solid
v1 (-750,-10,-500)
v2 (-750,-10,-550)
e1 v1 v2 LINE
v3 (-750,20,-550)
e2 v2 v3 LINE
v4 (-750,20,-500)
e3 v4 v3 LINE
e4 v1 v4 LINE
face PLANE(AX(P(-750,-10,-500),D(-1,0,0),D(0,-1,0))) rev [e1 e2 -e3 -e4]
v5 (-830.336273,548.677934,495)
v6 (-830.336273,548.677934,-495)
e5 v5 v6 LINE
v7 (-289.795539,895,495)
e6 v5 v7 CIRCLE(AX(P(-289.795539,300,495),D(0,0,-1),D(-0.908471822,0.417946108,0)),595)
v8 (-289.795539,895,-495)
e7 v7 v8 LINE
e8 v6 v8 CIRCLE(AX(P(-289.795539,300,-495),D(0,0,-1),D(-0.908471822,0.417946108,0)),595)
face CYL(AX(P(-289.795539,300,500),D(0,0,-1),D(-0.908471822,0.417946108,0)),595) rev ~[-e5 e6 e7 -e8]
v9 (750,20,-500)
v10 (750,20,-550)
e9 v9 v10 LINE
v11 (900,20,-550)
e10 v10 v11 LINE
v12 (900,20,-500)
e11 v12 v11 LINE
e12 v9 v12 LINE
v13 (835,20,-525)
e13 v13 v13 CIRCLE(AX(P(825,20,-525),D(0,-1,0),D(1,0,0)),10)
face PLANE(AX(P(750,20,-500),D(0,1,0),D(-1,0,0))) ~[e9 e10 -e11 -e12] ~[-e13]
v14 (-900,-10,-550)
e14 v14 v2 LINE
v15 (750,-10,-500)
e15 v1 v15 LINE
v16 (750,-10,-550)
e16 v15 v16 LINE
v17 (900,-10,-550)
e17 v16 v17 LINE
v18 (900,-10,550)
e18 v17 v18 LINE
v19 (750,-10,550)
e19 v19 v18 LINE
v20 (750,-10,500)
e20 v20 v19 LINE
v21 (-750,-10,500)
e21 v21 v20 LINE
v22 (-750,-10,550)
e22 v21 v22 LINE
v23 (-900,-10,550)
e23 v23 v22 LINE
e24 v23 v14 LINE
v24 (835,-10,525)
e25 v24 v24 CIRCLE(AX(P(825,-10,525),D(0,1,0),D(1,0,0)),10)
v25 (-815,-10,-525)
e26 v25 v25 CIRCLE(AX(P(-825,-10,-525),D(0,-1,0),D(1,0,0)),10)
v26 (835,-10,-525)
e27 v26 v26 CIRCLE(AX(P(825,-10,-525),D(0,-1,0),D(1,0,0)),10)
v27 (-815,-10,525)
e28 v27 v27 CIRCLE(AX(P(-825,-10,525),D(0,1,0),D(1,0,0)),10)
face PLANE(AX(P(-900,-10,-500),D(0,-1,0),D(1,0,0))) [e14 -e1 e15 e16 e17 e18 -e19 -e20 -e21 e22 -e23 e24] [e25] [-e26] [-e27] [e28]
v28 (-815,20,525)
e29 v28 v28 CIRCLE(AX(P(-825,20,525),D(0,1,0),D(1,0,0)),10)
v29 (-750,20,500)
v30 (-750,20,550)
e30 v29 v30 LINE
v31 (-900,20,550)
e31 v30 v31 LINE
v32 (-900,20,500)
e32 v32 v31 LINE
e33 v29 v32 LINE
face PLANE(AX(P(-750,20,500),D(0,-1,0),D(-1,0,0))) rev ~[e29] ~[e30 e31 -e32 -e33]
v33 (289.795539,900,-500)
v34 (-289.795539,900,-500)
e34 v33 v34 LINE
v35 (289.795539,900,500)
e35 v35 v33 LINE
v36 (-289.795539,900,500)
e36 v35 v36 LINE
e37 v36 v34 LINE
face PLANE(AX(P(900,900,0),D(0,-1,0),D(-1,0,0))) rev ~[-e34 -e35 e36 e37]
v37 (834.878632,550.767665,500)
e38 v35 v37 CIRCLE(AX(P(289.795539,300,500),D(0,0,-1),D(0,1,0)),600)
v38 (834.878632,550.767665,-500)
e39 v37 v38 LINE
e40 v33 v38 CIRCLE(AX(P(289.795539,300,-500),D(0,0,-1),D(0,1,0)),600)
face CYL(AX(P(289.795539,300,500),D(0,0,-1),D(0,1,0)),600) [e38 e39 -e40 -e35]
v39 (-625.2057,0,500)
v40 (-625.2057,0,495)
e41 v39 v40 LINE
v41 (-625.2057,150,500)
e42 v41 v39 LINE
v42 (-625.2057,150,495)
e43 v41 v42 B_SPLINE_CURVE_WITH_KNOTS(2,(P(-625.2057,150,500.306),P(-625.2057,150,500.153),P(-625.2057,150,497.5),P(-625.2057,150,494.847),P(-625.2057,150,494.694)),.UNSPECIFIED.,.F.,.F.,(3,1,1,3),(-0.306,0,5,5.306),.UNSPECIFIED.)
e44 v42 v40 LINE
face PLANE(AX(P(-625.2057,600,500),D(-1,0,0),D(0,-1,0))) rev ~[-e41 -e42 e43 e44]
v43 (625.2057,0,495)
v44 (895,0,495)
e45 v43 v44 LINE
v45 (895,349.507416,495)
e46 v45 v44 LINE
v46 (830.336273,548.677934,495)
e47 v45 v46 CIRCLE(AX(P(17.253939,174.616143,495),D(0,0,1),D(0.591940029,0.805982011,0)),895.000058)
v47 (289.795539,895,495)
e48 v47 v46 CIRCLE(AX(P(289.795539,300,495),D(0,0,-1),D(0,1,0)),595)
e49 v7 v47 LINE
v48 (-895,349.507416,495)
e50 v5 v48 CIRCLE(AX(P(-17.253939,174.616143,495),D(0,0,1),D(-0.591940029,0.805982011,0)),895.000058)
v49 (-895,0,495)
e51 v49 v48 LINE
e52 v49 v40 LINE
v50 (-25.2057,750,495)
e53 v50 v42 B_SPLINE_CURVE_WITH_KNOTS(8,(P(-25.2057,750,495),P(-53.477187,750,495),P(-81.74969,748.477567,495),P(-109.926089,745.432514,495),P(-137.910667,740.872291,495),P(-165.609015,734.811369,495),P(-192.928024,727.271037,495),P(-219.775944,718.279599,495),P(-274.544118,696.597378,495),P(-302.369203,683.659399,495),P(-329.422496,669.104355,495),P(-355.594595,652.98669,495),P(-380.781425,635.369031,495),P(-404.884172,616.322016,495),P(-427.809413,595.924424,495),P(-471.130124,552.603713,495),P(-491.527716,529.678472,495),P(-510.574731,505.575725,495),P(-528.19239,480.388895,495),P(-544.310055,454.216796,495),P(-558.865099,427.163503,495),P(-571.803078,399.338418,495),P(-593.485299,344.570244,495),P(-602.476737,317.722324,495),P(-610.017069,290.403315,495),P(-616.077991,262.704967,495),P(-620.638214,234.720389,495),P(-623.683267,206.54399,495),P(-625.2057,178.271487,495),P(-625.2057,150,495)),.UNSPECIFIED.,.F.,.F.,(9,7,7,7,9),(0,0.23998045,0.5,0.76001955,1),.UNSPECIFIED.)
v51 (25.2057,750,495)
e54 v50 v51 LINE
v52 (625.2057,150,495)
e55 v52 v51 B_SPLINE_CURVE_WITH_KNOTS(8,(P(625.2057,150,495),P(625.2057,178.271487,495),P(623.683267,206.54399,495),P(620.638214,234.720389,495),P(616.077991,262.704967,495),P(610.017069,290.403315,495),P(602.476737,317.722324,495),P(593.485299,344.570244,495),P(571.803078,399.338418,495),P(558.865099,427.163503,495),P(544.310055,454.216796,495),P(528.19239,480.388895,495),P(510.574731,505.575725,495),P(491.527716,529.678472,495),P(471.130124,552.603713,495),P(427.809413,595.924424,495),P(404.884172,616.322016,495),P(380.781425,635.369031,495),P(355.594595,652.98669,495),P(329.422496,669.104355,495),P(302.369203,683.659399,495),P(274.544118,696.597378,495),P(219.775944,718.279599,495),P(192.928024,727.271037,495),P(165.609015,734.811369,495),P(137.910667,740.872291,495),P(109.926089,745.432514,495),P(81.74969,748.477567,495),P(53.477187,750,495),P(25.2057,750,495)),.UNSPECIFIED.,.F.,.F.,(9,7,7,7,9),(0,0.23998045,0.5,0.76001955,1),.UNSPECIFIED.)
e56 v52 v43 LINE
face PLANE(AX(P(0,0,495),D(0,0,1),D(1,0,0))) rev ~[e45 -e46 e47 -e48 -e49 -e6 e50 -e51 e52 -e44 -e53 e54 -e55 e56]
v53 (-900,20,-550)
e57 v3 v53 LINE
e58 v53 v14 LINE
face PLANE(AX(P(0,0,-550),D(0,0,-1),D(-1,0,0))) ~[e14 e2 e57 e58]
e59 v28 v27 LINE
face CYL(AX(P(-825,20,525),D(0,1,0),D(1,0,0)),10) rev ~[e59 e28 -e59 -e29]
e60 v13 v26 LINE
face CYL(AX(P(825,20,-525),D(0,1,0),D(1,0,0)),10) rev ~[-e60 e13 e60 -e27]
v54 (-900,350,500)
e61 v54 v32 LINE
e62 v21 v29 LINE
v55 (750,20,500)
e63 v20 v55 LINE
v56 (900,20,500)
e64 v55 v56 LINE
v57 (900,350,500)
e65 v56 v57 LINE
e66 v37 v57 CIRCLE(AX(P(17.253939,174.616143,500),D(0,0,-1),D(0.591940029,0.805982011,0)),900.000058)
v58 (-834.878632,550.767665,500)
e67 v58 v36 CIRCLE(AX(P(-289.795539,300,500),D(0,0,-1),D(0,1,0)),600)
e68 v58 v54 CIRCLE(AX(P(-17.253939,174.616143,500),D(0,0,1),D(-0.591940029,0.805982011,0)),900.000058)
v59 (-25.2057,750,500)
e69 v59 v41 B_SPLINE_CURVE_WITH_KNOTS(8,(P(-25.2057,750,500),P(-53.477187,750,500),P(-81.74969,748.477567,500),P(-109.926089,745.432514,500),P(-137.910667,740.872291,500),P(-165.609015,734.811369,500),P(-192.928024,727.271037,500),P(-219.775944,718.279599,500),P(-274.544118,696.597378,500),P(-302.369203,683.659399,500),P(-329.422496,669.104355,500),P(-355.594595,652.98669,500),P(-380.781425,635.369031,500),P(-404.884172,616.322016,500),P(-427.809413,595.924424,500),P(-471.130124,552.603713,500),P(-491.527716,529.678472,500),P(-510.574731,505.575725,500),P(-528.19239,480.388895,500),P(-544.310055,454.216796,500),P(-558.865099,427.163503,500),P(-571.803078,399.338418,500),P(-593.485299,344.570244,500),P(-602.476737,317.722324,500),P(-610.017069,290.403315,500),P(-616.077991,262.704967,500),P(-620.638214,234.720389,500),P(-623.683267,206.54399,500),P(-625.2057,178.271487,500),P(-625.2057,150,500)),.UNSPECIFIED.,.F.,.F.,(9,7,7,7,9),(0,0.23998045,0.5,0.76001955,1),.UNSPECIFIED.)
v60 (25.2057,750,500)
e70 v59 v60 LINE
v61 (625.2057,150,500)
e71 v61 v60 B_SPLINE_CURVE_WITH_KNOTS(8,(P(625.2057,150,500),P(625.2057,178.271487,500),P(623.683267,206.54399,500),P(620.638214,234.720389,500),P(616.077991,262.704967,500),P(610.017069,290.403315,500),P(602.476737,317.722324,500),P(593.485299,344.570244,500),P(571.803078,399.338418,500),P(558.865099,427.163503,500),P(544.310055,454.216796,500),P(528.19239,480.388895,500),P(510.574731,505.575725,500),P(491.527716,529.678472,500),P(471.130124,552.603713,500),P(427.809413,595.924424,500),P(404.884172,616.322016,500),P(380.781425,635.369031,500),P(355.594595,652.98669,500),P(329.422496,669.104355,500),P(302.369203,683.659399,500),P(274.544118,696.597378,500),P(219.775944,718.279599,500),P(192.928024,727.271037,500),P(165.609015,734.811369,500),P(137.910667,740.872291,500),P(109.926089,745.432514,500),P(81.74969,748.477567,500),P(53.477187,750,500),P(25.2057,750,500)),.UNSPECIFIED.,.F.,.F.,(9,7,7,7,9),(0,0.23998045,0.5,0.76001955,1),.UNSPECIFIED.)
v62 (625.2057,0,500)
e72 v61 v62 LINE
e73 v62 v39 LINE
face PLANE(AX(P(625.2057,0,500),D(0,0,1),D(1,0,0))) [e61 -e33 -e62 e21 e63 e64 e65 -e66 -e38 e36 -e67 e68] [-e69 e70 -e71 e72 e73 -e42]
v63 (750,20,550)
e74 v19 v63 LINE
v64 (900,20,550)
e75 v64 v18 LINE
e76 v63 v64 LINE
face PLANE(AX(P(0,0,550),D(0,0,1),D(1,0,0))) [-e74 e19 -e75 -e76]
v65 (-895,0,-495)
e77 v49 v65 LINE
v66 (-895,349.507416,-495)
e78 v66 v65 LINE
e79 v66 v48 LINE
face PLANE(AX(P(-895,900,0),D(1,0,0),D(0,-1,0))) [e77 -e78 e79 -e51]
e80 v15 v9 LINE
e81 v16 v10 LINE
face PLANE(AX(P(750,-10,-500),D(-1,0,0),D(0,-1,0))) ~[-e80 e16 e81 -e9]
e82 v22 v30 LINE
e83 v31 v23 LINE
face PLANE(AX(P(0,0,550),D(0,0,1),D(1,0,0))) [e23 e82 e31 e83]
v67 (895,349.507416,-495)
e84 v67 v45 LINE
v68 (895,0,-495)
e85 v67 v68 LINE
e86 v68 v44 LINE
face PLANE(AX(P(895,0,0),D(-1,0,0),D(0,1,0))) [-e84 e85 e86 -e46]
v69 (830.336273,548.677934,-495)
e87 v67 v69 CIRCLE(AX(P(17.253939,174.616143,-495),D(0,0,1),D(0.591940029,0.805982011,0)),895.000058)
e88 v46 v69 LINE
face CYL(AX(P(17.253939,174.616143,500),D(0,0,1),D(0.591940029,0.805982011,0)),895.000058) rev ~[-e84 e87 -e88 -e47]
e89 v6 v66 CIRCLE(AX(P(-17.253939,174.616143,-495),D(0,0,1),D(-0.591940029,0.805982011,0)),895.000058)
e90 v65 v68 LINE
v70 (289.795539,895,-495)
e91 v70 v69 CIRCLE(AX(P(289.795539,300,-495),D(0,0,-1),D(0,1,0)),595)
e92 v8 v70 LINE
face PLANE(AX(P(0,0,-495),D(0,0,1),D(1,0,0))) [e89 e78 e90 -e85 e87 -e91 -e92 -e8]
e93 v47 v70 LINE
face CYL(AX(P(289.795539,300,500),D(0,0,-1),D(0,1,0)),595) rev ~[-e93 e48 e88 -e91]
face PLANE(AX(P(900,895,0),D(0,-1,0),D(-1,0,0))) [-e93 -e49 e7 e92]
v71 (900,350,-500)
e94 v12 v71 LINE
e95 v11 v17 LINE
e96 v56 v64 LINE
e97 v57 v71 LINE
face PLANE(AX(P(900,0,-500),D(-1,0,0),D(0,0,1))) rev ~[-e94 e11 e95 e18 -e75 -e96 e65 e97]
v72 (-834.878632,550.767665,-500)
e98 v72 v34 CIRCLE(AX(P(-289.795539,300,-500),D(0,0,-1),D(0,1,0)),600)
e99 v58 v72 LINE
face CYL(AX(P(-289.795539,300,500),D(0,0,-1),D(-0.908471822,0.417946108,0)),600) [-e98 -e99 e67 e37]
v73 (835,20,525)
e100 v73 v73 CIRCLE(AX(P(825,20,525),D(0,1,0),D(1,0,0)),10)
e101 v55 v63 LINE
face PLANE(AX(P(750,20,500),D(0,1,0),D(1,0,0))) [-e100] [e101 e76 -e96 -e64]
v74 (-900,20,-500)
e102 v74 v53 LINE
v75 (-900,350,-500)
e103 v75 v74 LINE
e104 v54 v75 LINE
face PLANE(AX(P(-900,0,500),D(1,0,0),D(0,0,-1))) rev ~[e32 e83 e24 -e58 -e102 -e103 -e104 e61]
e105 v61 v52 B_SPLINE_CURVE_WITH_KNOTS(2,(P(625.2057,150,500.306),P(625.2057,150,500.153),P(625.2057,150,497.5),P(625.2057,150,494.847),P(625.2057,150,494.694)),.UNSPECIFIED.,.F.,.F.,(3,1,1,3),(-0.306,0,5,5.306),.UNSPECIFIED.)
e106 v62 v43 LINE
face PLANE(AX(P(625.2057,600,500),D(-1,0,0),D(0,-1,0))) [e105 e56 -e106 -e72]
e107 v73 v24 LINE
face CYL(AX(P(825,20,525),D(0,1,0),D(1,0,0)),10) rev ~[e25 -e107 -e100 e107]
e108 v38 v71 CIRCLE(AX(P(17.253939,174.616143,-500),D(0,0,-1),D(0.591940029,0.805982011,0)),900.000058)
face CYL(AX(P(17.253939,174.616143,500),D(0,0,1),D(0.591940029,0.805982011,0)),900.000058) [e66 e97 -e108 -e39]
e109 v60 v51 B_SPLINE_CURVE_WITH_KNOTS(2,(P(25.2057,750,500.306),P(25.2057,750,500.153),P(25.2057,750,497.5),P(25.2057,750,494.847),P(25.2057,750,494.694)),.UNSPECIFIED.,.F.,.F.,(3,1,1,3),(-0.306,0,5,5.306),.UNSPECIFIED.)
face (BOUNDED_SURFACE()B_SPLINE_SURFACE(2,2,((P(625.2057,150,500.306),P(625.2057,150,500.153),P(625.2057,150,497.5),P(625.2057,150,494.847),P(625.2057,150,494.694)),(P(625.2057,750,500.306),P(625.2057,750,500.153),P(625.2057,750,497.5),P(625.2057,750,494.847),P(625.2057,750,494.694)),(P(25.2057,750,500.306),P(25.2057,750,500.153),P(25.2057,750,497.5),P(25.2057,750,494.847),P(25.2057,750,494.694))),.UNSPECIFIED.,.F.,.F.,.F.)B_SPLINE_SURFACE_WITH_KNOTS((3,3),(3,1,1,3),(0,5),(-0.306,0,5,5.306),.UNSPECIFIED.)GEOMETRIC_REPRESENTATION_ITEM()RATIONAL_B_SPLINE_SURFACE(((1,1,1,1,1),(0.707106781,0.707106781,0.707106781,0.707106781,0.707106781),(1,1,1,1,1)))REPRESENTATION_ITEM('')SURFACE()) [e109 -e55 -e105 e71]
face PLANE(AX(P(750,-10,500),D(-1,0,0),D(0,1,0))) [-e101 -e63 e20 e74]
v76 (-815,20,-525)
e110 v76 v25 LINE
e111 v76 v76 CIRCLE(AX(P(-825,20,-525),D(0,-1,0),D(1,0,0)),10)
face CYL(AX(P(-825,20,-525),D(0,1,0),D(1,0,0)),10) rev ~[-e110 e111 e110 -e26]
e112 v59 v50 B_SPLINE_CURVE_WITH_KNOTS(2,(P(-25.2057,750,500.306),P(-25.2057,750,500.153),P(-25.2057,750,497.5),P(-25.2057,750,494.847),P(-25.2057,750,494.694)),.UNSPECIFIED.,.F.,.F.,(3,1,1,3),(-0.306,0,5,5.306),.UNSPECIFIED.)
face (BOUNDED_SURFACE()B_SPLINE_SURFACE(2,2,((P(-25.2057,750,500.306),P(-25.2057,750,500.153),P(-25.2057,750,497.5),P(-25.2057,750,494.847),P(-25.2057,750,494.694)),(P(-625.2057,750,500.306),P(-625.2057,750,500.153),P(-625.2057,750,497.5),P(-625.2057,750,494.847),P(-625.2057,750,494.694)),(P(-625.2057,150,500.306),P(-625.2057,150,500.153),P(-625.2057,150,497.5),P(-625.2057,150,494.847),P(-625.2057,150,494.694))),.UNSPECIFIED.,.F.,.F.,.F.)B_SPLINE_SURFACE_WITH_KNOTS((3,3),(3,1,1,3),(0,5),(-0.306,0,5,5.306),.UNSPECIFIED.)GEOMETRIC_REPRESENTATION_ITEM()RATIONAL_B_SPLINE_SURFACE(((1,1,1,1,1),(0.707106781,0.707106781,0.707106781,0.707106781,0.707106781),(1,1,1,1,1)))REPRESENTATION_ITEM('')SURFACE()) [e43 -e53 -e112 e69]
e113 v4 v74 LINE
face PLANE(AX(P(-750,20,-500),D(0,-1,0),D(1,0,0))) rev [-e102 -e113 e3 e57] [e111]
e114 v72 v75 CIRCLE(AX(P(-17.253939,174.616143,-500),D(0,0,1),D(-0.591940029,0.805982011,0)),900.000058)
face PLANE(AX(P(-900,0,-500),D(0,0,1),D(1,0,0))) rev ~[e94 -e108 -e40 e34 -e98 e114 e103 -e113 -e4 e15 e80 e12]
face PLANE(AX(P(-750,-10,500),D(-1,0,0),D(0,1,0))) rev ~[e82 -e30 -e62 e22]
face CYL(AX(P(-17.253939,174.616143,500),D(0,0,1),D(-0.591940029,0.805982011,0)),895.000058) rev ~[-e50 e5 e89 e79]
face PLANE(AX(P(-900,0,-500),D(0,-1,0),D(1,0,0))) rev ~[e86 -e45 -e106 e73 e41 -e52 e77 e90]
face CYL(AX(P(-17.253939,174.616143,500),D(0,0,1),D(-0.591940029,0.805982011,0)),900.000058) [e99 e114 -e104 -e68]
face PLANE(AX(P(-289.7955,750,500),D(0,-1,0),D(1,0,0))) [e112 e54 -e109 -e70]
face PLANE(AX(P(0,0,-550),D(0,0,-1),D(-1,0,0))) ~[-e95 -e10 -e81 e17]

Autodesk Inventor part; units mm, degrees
ref_plane "YZ Plane" through (0, 0, 0) normal (1, 0, 0) x (0, 1, 0)
ref_plane "XZ Plane" through (0, 0, 0) normal (0, 1, 0) x (-1, 0, 0)
ref_plane "XY Plane" through (0, 0, 0) normal (0, 0, 1) x (1, 0, 0)
sketch "Sketch1" plane through (0, 0, 0) normal (0, 0, 1) x (1, 0, 0)
  line L0 (-900, 0) -> (900, 0)
  line L1 (900, 0) -> (900, 900)
  line L2 (900, 900) -> (-900, 900)
  line L3 (-900, 900) -> (-900, 0)
  line L4 (0, 900) -> (0, 0) construction
  dimension "d0" = 900
  dimension "length" = 1800
extrude "Extrusion1" add sketch "Sketch1" along normal mid plane 1000
sketch "Sketch2" plane through (0, 0, 500) normal (0, 0, 1) x (1, 0, 0)
  line L0 (-900, 900) -> (-900, 0) projected
  arc A0 (-550, 900) -> (-900, 350) centre (-17.254, 174.6162) ccw
  line L1 (900, 900) -> (-900, 900) projected
  line L2 (-900, 350) -> (-900, 900)
  line L3 (-900, 900) -> (-550, 900)
  point P0 (0, 0)
  dimension "d5" = 900
  dimension "d6" = 550
  dimension "d7" = 350
extrude "Extrusion2" cut sketch "Sketch2" against normal blind 1000
mirror "Mirror1" about plane through (0, 0, 0) normal (1, 0, 0) of "Extrusion2"
fillet "Fillet1" radius 600 2 edges at (-550, 900, 0) (550, 900, 0)
sketch "Sketch3" plane through (0, 0, 500) normal (0, 0, 1) x (1, 0, 0)
  arc A0 (-289.7955, 900) -> (-834.8786, 550.7676) centre (-289.7955, 300) ccw projected
  line L0 (289.7955, 900) -> (-289.7955, 900) projected
  arc A1 (834.8786, 550.7676) -> (289.7955, 900) centre (289.7955, 300) ccw projected
  arc A2 (-289.7955, 750) -> (-625.2057, 600) centre (-289.7955, 300) ccw
  line L1 (-289.7955, 750) -> (289.7955, 750)
  arc A3 (625.2057, 600) -> (289.7955, 750) centre (289.7955, 300) ccw
  line L2 (-625.2057, 600) -> (-625.2057, 0)
  line L3 (900, 0) -> (-900, 0) projected
  line L4 (625.2057, 600) -> (625.2057, 0)
  line L5 (625.2057, 0) -> (-625.2057, 0)
  point P0 (0, 0)
  point P1 (625.2057, 0)
  dimension "d11" = 150
  dimension "d12" = 600
shell "Shell2" thickness 5 removed faces 1 at (300, 0, 166.6667)
extrude "Extrusion3" cut sketch "Sketch3" against normal blind 10
fillet "Fillet2" radius 600 2 edges at (-625.2057, 600, 497.5) (625.2057, 600, 497.5)
sketch "Sketch4" plane through (-900, 0, -500) normal (0, -1, 0) x (1, 0, 0)
  line L0 (1525.2057, 1000) -> (1800, 1000) projected
  line L1 (0, 0) -> (1800, 0)
  line L2 (1800, 0) -> (1800, 1000)
  line L3 (1800, 1000) -> (0, 1000)
  line L4 (0, 1000) -> (0, 0)
  point P0 (900, 500)
extrude "Extrusion4" add sketch "Sketch4" along normal blind 10
sketch "Sketch5" plane through (0, 0, 500) normal (0, 0, 1) x (1, 0, 0)
  line L0 (-900, -10) -> (900, -10) projected
  line L1 (-900, -10) -> (-750, -10)
  line L2 (-750, -10) -> (-750, 20)
  line L3 (-750, 20) -> (-900, 20)
  line L4 (-900, 20) -> (-900, -10)
  line L5 (900, -10) -> (750, -10)
  line L6 (750, -10) -> (750, 20)
  line L7 (750, 20) -> (900, 20)
  line L8 (900, 20) -> (900, -10)
  point P0 (0, 0)
  dimension "d19" = 30
  dimension "d20" = 150
extrude "Extrusion5" add sketch "Sketch5" along normal blind 50
sketch "Sketch6" plane through (-900, 20, 500) normal (0, 1, 0) x (1, 0, 0)
  circle A0 centre (75, -25) radius 10
  circle A1 centre (1725, -25) radius 10
  line L0 (75, -25) -> (1725, -25) construction
  line L1 (1800, -50) -> (1650, -50) construction
  line L2 (1650, 0) -> (1650, -50) construction
  line L3 (0, 0) -> (0, -50) construction
  line L4 (75, -25) -> (0, -25) construction
  line L5 (1725, -25) -> (1800, -25) construction
  line L6 (1800, 1000) -> (1800, -50) construction
  point P0 (900, 500)
  dimension "d25" = 20
  dimension "d31" = 1650
  dimension "d32" = 75
extrude "Extrusion6" cut sketch "Sketch6" against normal blind 30
mirror "Mirror2" about plane through (0, 0, 0) normal (0, 0, 1) of "Extrusion6", "Extrusion5"
ref_plane "Work Plane1" through (0, 0, 0) normal (1, 0, 0) x (0, 1, 0)
equation "\"d0\" = 0.5 * length"
equation "\"d5\" = 0.5 * length"
equation "\"d11\" = 0.0833333 * length"
equation "\"d12\" = 0.333333 * length"
equation "\"d13\" = 0.00277778 * length"
equation "\"d14\" = 0.00555556 * length"
equation "\"d17\" = 0.00555556 * length"
equation "\"d19\" = 0.0166667 * length"
equation "\"d20\" = 0.0833333 * length"
equation "\"d23\" = 0.0277778 * length"
equation "\"d25\" = 0.02 * d2"
equation "\"d32\" = 0.0416667 * length"
equation "\"d29\" = 0.0166667 * length"
equation "\"d2\" = 1000"
properties part number "COVER, updated"
